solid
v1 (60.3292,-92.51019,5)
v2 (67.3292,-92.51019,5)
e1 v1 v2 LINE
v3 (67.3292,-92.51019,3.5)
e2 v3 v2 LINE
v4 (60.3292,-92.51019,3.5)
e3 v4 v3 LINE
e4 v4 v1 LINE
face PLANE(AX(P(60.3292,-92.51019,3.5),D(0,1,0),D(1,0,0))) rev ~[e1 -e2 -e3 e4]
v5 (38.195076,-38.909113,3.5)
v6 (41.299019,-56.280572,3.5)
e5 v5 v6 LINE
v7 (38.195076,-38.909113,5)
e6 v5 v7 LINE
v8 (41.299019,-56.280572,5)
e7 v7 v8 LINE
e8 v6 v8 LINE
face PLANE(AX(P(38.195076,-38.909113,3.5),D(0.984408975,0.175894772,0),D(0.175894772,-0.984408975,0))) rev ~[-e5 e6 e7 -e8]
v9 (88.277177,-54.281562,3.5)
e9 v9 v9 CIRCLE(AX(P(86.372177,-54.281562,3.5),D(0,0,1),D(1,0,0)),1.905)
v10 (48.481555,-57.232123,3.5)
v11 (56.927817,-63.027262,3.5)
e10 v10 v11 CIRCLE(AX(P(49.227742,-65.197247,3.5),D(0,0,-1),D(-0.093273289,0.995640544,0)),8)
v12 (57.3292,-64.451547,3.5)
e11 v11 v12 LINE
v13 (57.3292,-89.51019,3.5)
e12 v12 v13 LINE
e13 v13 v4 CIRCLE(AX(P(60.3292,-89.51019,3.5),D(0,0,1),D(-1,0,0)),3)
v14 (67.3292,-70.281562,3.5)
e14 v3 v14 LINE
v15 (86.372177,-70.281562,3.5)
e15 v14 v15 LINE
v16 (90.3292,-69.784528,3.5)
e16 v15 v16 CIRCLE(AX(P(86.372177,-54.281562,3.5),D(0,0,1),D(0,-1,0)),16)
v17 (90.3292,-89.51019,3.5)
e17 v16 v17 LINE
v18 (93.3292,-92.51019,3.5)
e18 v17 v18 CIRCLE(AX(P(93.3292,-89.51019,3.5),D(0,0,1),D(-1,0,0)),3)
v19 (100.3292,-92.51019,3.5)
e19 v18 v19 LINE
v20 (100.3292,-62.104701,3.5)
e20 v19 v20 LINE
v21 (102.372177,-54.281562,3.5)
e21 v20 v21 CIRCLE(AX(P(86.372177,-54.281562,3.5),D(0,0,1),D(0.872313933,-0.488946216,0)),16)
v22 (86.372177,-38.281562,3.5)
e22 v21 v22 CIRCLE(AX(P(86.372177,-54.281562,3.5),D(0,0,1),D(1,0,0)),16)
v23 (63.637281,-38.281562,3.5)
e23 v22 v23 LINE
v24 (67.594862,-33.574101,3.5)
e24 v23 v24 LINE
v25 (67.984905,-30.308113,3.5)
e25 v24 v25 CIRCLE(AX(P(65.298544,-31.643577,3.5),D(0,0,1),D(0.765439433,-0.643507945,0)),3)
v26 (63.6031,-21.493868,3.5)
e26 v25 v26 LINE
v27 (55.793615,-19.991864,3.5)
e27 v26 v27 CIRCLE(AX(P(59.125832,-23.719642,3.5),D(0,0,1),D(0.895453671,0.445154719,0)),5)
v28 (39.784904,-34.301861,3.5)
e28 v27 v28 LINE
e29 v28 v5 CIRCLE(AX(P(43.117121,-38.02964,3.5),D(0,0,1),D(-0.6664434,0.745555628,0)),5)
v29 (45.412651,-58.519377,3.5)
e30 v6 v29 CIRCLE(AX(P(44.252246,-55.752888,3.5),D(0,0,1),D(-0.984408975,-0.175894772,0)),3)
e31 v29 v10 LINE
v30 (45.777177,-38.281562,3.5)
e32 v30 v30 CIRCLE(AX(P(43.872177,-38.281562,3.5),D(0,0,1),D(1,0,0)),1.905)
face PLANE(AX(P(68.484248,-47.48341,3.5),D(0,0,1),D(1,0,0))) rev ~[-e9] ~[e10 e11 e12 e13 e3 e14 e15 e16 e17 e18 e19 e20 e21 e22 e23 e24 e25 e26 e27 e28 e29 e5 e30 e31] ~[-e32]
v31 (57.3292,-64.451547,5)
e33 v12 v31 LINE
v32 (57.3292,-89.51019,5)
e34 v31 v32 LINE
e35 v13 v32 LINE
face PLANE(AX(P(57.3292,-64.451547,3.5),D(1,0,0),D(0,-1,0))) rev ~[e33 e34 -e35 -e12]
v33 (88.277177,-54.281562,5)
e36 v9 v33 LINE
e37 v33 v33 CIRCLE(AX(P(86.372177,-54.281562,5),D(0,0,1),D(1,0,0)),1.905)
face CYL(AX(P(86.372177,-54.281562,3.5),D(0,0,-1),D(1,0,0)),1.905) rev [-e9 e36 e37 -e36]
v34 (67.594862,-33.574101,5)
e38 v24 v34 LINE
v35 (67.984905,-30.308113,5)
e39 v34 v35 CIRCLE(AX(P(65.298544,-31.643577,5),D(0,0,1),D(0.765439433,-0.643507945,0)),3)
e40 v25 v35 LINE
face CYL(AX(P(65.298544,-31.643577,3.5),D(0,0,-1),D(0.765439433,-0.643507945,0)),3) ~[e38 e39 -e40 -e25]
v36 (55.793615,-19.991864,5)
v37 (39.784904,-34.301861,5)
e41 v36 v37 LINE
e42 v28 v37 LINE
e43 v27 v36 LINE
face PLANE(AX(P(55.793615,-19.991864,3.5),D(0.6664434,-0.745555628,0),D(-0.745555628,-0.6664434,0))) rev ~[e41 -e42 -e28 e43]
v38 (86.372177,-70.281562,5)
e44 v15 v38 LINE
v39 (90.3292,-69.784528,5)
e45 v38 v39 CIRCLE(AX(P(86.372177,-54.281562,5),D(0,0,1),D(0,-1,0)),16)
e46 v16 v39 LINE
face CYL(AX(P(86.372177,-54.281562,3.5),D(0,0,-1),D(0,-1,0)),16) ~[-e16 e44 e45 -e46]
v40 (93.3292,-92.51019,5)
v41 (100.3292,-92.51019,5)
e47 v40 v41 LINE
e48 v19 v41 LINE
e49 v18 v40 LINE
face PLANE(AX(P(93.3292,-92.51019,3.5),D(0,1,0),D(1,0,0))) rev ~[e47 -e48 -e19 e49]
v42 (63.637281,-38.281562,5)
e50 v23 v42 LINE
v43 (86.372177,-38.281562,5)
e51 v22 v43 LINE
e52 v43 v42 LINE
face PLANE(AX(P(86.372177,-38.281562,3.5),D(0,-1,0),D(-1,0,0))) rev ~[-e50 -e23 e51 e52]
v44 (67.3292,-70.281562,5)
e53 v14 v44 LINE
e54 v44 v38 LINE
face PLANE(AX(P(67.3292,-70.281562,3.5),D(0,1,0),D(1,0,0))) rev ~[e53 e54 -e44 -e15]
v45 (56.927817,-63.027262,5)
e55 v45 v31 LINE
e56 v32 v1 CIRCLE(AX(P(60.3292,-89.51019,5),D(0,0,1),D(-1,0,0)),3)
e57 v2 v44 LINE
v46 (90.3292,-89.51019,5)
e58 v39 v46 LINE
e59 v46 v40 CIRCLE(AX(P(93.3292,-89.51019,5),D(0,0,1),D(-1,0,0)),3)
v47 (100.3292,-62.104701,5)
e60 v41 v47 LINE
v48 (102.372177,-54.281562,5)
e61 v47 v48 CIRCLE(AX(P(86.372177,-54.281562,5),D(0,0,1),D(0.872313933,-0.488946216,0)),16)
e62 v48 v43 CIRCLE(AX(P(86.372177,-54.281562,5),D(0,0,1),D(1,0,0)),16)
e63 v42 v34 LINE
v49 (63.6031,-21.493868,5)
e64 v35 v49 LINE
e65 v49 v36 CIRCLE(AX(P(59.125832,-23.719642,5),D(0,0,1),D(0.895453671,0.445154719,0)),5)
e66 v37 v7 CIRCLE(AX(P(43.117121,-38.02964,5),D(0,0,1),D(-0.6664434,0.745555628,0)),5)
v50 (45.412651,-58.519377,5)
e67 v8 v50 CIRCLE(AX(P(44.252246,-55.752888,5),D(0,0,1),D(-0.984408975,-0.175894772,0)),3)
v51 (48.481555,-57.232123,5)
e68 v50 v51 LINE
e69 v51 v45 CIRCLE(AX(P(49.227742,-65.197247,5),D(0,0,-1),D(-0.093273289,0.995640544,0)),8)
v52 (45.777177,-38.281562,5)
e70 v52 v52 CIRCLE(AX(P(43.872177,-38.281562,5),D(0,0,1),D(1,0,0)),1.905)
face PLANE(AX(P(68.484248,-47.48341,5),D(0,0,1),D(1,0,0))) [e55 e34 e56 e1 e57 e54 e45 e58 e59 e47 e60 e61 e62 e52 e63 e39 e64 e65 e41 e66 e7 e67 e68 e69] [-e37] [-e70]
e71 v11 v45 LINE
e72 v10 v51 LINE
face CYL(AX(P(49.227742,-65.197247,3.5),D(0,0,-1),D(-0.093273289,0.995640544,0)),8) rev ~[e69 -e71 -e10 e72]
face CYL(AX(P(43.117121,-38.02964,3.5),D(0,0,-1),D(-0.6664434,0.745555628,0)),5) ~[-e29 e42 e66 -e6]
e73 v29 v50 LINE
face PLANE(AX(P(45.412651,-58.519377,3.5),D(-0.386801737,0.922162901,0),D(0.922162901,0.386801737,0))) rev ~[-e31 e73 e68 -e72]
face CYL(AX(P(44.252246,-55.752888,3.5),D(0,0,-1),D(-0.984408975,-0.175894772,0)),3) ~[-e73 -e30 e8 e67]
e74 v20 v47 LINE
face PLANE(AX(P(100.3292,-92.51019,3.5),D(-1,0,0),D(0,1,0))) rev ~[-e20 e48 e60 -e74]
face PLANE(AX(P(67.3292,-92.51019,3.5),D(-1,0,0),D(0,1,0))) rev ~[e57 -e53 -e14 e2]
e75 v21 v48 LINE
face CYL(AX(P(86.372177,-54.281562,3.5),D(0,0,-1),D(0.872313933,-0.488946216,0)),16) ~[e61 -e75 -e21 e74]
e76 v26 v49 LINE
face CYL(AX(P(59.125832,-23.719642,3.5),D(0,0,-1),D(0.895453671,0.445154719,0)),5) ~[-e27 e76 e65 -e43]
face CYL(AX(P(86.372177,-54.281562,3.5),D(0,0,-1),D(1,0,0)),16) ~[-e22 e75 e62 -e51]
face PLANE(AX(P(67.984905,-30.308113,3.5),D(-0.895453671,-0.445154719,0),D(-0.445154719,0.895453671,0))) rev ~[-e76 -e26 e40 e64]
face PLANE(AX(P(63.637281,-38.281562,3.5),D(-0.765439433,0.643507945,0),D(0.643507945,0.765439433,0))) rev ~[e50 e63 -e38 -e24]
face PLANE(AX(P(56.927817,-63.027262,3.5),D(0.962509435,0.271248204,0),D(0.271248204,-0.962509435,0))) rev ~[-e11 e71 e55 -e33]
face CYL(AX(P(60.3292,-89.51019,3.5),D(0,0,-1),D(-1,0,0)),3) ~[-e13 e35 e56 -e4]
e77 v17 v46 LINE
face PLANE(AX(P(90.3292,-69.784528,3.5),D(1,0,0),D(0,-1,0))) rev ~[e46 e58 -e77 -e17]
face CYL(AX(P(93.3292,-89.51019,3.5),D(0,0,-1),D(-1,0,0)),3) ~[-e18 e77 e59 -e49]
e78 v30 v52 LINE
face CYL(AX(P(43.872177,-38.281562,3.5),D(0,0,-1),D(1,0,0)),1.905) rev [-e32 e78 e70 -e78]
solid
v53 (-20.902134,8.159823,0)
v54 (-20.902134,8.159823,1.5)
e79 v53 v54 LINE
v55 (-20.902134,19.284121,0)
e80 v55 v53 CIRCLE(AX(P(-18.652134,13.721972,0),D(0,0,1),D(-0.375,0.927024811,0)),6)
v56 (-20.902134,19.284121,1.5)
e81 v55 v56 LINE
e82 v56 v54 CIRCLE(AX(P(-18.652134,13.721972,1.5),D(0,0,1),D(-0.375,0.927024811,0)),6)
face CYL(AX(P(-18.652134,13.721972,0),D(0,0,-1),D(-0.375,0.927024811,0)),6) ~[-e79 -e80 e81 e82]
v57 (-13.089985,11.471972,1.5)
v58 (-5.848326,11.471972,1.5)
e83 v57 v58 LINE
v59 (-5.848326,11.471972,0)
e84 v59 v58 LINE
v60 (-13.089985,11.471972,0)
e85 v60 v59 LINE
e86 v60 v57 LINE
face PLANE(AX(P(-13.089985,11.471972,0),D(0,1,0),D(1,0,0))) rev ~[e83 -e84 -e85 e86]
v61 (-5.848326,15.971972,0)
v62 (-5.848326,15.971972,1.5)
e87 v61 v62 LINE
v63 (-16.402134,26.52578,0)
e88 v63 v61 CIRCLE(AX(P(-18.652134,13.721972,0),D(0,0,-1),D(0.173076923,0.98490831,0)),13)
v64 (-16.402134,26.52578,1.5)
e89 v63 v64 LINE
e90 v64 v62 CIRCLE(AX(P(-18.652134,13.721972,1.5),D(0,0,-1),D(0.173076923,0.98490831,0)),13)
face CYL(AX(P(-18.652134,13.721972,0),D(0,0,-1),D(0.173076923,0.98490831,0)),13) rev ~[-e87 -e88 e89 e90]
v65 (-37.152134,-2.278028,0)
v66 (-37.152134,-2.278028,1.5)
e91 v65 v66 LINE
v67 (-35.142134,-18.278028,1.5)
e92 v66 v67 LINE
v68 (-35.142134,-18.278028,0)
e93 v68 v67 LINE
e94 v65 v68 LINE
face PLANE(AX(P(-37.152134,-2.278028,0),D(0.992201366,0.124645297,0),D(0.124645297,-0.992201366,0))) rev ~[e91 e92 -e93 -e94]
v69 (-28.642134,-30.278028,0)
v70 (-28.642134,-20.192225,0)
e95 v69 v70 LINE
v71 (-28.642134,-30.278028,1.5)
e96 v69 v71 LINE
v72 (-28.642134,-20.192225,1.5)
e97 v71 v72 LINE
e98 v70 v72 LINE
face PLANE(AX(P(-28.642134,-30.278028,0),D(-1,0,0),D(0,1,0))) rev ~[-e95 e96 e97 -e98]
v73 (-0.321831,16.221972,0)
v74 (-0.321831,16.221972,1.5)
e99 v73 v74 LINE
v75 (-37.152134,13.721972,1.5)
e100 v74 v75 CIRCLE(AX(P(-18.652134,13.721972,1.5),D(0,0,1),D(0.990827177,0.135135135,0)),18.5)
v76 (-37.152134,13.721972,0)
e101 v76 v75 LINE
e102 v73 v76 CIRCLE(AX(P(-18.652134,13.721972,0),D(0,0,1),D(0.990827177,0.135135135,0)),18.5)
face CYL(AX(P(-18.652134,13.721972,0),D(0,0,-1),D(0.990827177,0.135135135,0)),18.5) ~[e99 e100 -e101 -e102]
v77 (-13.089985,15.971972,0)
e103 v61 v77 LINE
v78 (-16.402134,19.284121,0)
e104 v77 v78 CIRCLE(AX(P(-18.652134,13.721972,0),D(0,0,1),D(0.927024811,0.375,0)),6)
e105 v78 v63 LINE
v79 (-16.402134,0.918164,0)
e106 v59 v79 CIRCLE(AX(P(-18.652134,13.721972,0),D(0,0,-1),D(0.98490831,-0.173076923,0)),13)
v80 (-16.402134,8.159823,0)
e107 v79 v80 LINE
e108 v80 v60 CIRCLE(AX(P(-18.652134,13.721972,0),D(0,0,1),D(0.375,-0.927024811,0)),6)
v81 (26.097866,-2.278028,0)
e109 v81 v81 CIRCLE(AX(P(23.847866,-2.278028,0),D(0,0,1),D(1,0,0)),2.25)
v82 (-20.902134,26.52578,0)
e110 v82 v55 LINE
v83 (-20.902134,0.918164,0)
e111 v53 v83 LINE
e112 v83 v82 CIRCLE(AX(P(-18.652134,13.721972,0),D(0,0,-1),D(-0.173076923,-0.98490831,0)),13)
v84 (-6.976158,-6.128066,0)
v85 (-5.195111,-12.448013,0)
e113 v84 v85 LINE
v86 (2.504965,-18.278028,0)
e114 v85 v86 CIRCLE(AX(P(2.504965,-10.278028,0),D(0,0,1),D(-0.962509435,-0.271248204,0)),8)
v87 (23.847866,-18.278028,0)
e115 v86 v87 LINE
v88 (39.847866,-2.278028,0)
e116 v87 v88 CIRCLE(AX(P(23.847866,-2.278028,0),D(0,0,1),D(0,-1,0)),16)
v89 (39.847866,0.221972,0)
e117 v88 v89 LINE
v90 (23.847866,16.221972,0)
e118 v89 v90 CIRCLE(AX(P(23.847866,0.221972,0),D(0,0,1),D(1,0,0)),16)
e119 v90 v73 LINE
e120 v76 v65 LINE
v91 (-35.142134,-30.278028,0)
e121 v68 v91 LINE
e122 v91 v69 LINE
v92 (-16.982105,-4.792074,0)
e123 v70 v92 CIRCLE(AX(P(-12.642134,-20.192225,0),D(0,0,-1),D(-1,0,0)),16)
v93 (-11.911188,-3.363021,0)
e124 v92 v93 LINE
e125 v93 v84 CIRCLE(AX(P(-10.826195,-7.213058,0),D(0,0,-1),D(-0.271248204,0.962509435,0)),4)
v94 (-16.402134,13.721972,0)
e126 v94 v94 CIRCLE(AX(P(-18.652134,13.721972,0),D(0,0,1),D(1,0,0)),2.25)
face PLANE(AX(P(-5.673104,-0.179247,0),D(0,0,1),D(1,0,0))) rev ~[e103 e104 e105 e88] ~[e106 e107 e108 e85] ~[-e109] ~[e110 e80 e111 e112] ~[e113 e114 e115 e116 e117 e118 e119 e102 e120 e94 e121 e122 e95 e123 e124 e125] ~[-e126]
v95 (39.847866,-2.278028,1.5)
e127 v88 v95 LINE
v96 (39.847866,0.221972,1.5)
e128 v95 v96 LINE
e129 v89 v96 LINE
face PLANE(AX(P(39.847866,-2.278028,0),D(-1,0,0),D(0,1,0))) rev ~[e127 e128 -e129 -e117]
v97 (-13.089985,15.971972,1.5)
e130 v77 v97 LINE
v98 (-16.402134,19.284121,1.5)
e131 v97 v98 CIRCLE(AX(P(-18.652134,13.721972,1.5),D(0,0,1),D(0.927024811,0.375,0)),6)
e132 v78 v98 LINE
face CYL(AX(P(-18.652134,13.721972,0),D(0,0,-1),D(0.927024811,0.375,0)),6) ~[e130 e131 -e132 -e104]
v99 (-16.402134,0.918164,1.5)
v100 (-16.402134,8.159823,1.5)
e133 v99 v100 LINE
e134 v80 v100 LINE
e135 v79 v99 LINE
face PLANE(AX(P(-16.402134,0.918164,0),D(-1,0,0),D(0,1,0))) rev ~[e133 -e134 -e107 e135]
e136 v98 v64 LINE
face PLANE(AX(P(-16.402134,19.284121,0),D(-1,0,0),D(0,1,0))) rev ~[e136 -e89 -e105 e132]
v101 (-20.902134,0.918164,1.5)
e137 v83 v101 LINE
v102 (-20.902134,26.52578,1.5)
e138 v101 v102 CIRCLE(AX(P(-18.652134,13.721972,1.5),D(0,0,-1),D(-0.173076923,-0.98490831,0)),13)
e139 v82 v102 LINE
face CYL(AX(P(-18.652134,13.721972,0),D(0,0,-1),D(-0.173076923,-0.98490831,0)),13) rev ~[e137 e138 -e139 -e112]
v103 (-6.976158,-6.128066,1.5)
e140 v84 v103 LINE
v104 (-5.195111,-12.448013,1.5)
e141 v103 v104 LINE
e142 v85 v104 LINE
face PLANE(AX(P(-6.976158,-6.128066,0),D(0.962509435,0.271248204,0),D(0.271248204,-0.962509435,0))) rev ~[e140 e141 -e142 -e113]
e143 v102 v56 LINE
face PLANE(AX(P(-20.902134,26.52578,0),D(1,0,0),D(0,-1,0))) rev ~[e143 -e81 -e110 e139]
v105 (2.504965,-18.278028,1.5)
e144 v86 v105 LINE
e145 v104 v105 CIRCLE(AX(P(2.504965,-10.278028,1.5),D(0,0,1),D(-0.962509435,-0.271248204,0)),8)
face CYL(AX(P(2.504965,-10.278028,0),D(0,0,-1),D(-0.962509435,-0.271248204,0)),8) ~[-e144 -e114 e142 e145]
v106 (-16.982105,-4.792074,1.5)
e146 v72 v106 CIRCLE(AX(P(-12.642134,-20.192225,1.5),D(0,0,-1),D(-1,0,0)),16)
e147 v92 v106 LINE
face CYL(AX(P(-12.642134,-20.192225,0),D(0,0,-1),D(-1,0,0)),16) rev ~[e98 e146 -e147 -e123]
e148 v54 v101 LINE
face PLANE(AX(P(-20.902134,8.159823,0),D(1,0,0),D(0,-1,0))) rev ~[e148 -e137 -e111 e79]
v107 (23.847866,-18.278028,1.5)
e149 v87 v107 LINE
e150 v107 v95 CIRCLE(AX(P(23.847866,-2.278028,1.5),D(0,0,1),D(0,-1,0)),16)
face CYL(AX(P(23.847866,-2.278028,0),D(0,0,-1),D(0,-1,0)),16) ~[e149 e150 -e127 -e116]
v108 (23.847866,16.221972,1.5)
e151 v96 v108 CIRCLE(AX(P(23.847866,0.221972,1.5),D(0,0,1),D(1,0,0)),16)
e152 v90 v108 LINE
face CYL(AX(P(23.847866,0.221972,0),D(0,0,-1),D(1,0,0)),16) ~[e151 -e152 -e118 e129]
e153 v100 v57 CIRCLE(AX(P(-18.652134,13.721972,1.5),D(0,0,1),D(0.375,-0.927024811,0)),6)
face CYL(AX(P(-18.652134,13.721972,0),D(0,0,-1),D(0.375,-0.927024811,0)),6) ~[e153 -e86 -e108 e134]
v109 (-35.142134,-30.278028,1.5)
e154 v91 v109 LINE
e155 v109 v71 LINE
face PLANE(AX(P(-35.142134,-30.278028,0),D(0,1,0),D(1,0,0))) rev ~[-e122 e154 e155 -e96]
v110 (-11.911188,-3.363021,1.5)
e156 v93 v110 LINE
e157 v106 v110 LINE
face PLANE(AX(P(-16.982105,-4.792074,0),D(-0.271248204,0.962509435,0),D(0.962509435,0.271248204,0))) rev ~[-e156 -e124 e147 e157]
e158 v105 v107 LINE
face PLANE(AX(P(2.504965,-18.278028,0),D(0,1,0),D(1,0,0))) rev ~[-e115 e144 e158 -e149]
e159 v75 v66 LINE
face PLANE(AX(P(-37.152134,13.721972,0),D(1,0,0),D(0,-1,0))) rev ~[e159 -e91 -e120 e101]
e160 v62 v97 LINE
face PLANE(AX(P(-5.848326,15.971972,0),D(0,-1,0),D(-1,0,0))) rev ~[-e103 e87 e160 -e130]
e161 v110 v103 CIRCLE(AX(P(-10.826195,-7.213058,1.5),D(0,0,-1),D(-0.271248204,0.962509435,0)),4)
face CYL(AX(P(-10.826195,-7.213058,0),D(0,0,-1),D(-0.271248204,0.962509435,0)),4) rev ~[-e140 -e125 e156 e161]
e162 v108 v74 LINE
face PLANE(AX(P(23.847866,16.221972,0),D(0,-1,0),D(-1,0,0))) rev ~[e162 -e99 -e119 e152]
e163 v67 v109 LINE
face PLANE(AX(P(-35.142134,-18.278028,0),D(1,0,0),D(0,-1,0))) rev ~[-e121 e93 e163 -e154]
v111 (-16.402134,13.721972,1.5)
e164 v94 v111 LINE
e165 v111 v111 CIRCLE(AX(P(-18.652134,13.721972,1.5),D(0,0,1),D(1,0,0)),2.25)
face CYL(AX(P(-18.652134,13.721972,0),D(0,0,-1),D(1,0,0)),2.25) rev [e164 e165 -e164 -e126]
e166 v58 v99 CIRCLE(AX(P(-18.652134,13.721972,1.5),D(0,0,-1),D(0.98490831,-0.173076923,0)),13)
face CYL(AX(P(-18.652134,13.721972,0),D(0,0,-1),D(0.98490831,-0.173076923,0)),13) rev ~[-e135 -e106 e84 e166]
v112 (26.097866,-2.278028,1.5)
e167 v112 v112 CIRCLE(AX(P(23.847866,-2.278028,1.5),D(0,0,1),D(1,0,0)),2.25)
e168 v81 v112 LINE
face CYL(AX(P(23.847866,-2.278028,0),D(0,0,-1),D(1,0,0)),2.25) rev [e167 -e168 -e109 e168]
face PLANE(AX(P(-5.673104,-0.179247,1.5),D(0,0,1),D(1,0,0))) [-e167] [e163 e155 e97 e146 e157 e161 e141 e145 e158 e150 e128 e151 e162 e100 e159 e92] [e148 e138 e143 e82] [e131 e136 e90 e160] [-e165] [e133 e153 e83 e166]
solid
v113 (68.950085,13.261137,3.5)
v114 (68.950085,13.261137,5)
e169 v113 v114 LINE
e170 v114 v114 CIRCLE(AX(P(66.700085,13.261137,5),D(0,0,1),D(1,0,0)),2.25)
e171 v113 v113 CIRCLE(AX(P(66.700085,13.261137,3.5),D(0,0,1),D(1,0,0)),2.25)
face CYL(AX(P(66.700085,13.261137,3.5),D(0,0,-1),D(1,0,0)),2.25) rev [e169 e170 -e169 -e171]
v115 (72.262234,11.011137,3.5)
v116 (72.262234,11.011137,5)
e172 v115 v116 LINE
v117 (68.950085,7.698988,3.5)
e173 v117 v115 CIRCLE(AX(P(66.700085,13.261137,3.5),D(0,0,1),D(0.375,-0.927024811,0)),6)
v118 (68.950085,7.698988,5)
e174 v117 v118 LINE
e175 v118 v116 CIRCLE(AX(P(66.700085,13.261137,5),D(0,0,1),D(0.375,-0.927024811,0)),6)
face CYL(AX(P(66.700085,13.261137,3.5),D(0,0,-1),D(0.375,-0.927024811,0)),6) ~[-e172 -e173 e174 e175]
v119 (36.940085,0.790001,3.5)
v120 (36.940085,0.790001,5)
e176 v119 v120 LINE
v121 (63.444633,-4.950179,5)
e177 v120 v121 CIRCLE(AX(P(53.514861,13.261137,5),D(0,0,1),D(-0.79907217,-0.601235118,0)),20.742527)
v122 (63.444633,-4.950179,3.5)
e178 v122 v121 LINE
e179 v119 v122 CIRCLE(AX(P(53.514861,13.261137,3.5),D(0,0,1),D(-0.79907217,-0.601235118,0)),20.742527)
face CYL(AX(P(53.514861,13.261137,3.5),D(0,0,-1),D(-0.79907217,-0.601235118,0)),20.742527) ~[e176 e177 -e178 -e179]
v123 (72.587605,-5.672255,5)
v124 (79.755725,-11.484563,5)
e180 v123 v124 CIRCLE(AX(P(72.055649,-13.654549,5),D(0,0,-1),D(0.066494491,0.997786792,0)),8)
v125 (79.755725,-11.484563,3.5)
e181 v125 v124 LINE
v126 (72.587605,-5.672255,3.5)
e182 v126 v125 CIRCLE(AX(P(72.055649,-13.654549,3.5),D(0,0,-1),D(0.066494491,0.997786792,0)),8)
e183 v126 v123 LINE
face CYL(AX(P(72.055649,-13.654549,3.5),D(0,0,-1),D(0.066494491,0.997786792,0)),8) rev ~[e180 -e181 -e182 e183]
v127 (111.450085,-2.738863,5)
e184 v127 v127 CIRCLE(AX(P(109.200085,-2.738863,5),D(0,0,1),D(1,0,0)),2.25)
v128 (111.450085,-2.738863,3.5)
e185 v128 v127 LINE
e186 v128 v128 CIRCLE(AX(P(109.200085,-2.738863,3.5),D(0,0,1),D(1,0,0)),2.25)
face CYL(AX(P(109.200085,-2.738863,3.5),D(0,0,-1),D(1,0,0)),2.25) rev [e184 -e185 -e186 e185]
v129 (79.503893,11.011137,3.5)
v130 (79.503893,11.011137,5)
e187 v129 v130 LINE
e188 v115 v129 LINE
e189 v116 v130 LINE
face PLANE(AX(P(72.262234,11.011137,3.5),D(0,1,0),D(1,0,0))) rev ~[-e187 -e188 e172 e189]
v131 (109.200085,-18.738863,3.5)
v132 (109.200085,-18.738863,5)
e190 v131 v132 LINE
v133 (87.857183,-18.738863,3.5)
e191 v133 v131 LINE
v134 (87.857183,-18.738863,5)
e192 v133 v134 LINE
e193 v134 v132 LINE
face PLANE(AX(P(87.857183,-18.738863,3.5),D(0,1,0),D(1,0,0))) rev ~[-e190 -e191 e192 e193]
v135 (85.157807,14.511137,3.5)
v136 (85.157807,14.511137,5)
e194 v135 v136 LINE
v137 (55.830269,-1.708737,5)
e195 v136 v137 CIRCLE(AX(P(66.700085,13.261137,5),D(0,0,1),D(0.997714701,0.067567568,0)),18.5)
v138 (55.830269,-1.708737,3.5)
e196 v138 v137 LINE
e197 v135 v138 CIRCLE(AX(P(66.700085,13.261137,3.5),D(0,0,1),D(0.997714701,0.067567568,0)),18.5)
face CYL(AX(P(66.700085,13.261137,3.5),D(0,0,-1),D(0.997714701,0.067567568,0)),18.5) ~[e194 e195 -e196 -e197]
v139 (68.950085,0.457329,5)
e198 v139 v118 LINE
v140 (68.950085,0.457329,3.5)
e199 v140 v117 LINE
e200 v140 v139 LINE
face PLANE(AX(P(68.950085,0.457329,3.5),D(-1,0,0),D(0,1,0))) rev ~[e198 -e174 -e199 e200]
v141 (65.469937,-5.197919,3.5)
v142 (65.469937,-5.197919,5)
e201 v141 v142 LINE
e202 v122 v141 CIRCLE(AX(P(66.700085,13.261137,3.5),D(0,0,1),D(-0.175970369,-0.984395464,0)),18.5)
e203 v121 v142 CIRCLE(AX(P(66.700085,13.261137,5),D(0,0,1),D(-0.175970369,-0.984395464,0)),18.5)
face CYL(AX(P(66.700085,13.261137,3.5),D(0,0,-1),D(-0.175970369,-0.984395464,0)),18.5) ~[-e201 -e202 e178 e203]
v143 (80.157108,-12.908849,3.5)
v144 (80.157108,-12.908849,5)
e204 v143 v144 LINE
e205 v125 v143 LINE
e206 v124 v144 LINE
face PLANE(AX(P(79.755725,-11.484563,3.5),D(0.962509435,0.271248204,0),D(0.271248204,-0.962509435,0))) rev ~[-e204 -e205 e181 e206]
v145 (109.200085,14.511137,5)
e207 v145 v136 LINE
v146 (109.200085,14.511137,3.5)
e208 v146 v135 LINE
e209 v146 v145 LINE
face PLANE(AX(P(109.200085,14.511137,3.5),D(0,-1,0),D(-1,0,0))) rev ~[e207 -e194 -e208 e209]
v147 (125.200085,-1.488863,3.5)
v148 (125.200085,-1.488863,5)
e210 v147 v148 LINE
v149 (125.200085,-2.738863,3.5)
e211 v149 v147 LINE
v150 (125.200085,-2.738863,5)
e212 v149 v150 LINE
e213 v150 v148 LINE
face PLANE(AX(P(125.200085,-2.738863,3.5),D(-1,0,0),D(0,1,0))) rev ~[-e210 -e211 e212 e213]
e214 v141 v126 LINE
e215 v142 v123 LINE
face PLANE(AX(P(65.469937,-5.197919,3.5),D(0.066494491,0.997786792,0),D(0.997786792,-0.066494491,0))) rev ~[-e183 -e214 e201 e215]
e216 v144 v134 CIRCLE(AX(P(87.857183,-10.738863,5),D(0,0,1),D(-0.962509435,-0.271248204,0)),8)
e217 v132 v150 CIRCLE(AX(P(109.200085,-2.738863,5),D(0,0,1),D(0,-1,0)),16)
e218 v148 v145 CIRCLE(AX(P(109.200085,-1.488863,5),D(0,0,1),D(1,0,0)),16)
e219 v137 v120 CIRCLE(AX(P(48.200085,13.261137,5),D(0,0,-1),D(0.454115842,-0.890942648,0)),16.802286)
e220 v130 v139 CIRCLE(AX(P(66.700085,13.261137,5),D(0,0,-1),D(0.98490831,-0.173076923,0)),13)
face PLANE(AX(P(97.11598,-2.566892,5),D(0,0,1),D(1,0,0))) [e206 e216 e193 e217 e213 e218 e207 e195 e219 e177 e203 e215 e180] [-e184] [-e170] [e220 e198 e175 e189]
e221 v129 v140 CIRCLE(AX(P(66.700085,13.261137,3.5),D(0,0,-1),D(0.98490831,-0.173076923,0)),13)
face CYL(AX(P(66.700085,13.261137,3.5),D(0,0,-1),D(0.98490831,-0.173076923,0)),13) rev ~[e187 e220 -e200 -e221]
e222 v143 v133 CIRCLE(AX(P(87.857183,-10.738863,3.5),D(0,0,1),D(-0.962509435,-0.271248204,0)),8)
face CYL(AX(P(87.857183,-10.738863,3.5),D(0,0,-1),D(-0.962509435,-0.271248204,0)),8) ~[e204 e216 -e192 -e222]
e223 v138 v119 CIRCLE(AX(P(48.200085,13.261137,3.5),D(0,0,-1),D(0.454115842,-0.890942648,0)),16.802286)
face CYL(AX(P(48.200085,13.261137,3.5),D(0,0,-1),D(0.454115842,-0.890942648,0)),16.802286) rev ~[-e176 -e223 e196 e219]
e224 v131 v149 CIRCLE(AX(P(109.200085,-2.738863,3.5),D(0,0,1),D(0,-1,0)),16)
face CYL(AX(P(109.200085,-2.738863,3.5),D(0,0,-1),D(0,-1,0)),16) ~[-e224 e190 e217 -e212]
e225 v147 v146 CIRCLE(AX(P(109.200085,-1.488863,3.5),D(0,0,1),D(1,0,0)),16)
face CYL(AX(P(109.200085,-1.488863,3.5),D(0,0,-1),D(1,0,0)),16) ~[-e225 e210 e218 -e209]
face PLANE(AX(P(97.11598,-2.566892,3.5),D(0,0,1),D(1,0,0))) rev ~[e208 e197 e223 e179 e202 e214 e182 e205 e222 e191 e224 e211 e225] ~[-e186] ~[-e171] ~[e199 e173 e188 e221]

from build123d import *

# Parameters (mm, degrees)
F1_R     = 2.25
F2_DEPTH = 1.5
F3_R     = 2.25
F4_DEPTH = 1.5
F5_R     = 1.905
F6_DEPTH = 1.5


# Not quite as in the source:
# - a feature names something its author has since deleted; it is built from what else it names


with BuildPart() as f2:
    # F1 (on Top) → F2 (new body)
    with BuildSketch(Plane.XY):
        with BuildLine():
            Line((23.8478663564, 16.2219721824), (-0.3218308638, 16.2219721824))
            ThreePointArc((-0.3218308638, 16.2219721824), (-19.9050100488, 32.1794991216), (-37.1521336436, 13.7219721824))
            Line((-37.1521336436, 13.7219721824), (-37.1521336436, -2.2780278176))
            Line((-37.1521336436, -2.2780278176), (-35.1421336436, -18.2780278176))
            Line((-35.1421336436, -18.2780278176), (-35.1421336436, -30.2780278176))
            Line((-35.1421336436, -30.2780278176), (-28.6421336436, -30.2780278176))
            Line((-28.6421336436, -30.2780278176), (-28.6421336436, -20.1922246362))
            ThreePointArc((-28.6421336436, -20.1922246362), (-25.3982996099, -10.5340555633), (-16.9821049136, -4.7920736832))
            Line((-16.9821049136, -4.7920736832), (-11.9111882435, -3.3630206351))
            ThreePointArc((-11.9111882435, -3.3630206351), (-8.8710134123, -3.723464802), (-6.9761576878, -6.1280655559))
            Line((-6.9761576878, -6.1280655559), (-5.1951107108, -12.4480134526))
            ThreePointArc((-5.1951107108, -12.4480134526), (-2.3241197708, -16.6561108008), (2.5049647657, -18.2780278176))
            Line((2.5049647657, -18.2780278176), (23.8478663564, -18.2780278176))
            ThreePointArc((23.8478663564, -18.2780278176), (35.1615748554, -13.5917363166), (39.8478663564, -2.2780278176))
            Line((39.8478663564, -2.2780278176), (39.8478663564, 0.2219721824))
            ThreePointArc((39.8478663564, 0.2219721824), (35.1615748554, 11.5356806814), (23.8478663564, 16.2219721824))
        make_face()
        with Locations((23.8478663564, -2.2780278176)):
            Circle(F1_R, mode=Mode.SUBTRACT)
        with BuildLine():
            Line((-20.9021336436, 26.5257802097), (-20.9021336436, 19.2841210477))
            ThreePointArc((-20.9021336436, 19.2841210477), (-24.6521336436, 13.7219721824), (-20.9021336436, 8.1598233171))
            Line((-20.9021336436, 8.1598233171), (-20.9021336436, 0.9181641551))
            ThreePointArc((-20.9021336436, 0.9181641551), (-31.6521336436, 13.7219721824), (-20.9021336436, 26.5257802097))
        make_face(mode=Mode.SUBTRACT)
        with Locations((-18.6521336436, 13.7219721824)):
            Circle(F1_R, mode=Mode.SUBTRACT)
        with BuildLine():
            ThreePointArc((-16.4021336436, 8.1598233171), (-14.4094929565, 9.4793314953), (-13.0899847783, 11.4719721824))
            Line((-13.0899847783, 11.4719721824), (-5.8483256163, 11.4719721824))
            ThreePointArc((-5.8483256163, 11.4719721824), (-9.4597454882, 4.529584027), (-16.4021336436, 0.9181641551))
            Line((-16.4021336436, 0.9181641551), (-16.4021336436, 8.1598233171))
        make_face(mode=Mode.SUBTRACT)
        with BuildLine():
            ThreePointArc((-13.0899847783, 15.9719721824), (-14.4094929565, 17.9646128695), (-16.4021336436, 19.2841210477))
            Line((-16.4021336436, 19.2841210477), (-16.4021336436, 26.5257802097))
            ThreePointArc((-16.4021336436, 26.5257802097), (-9.4597454882, 22.9143603378), (-5.8483256163, 15.9719721824))
            Line((-5.8483256163, 15.9719721824), (-13.0899847783, 15.9719721824))
        make_face(mode=Mode.SUBTRACT)
    extrude(amount=F2_DEPTH)


with BuildPart() as f4:
    # F3 (on offset) → F4 (new body)
    with BuildSketch(Plane.XY.offset(3.5)):
        with BuildLine():
            Line((109.2000847661, 14.5111365989), (85.1578067274, 14.5111365989))
            ThreePointArc((85.1578067274, 14.5111365989), (85.1895122354, 13.8864939832), (85.2000847661, 13.2611365989))
            ThreePointArc((85.2000847661, 13.2611365989), (79.3391563377, -0.2482627146), (65.4699366786, -5.1979190563))
            Line((65.4699366786, -5.1979190563), (72.5876051284, -5.6722546017))
            ThreePointArc((72.5876051284, -5.6722546017), (77.0942321722, -7.4406386068), (79.7557246751, -11.4845633041))
            Line((79.7557246751, -11.4845633041), (80.1571076989, -12.9088490361))
            ThreePointArc((80.1571076989, -12.9088490361), (83.028098639, -17.1169463843), (87.8571831754, -18.7388634011))
            Line((87.8571831754, -18.7388634011), (109.2000847661, -18.7388634011))
            ThreePointArc((109.2000847661, -18.7388634011), (120.5137932651, -14.0525719001), (125.2000847661, -2.7388634011))
            Line((125.2000847661, -2.7388634011), (125.2000847661, -1.4888634011))
            ThreePointArc((125.2000847661, -1.4888634011), (120.5137932651, 9.8248450979), (109.2000847661, 14.5111365989))
        make_face()
        with Locations((109.2000847661, -2.7388634011)):
            Circle(F3_R, mode=Mode.SUBTRACT)
        with BuildLine():
            ThreePointArc((85.2000847661, 13.2611365989), (85.1895122354, 13.8864939832), (85.1578067274, 14.5111365989))
            ThreePointArc((85.1578067274, 14.5111365989), (57.7465852827, 29.4501713755), (55.8302690835, -1.7087367147))
            ThreePointArc((55.8302690835, -1.7087367147), (59.4538765607, -3.7606866479), (63.4446329394, -4.9501794822))
            ThreePointArc((63.4446329394, -4.9501794822), (64.4538667509, -5.1019923455), (65.4699366786, -5.1979190563))
            ThreePointArc((65.4699366786, -5.1979190563), (79.3391563377, -0.2482627146), (85.2000847661, 13.2611365989))
        make_face()
        with BuildLine():
            Line((68.9500847661, 0.4573285716), (68.9500847661, 7.6989877336))
            ThreePointArc((68.9500847661, 7.6989877336), (70.9427254533, 9.0184959118), (72.2622336315, 11.0111365989))
            Line((72.2622336315, 11.0111365989), (79.5038927935, 11.0111365989))
            ThreePointArc((79.5038927935, 11.0111365989), (75.8924729216, 4.0687484435), (68.9500847661, 0.4573285716))
        make_face(mode=Mode.SUBTRACT)
        with Locations((66.7000847661, 13.2611365989)):
            Circle(F3_R, mode=Mode.SUBTRACT)
        with BuildLine():
            ThreePointArc((63.4446329394, -4.9501794822), (59.4538765607, -3.7606866479), (55.8302690835, -1.7087367147))
            ThreePointArc((55.8302690835, -1.7087367147), (45.9967207055, -3.3960542374), (36.9400847661, 0.7900011357))
            ThreePointArc((36.9400847661, 0.7900011357), (49.1243667434, -7.0114058331), (63.4446329394, -4.9501794822))
        make_face()
    extrude(amount=F4_DEPTH)


with BuildPart() as f6:
    # F5 (on offset) → F6 (new body)
    with BuildSketch(Plane.XY.offset(3.5)):
        with BuildLine():
            Line((86.3721772379, -38.2815617886), (63.6372811817, -38.2815617886))
            Line((63.6372811817, -38.2815617886), (67.5948618811, -33.5741011418))
            ThreePointArc((67.5948618811, -33.5741011418), (68.2773760162, -31.9993262849), (67.9849045951, -30.3081131515))
            Line((67.9849045951, -30.3081131515), (63.6031002529, -21.4938680874))
            ThreePointArc((63.6031002529, -21.4938680874), (60.07017827, -18.8096304864), (55.7936149014, -19.9918635388))
            Line((55.7936149014, -19.9918635388), (39.7849043568, -34.3018614395))
            ThreePointArc((39.7849043568, -34.3018614395), (38.3906107486, -36.3986590518), (38.195076482, -38.9091134417))
            Line((38.195076482, -38.9091134417), (41.2990189026, -56.2805721912))
            ThreePointArc((41.2990189026, -56.2805721912), (42.8181559772, -58.3879184832), (45.412651037, -58.5193765789))
            Line((45.412651037, -58.5193765789), (48.4815553554, -57.232122972))
            ThreePointArc((48.4815553554, -57.232122972), (53.7537831872, -58.6006612256), (56.9278171468, -63.0272616916))
            Line((56.9278171468, -63.0272616916), (57.3292001707, -64.4515474235))
            ThreePointArc((57.3292001707, -64.4515474235), (60.2001911107, -68.6596447717), (65.0292756472, -70.2815617886))
            Line((65.0292756472, -70.2815617886), (67.3292001707, -70.2815617886))
            Line((67.3292001707, -70.2815617886), (86.3721772379, -70.2815617886))
            ThreePointArc((86.3721772379, -70.2815617886), (88.3662354627, -70.1568171187), (90.3292001707, -69.7845282631))
            ThreePointArc((90.3292001707, -69.7845282631), (96.117596449, -66.9711955264), (100.3292001707, -62.1047012385))
            ThreePointArc((100.3292001707, -62.1047012385), (101.8530100147, -58.324310425), (102.3721772379, -54.2815617886))
            ThreePointArc((102.3721772379, -54.2815617886), (97.6858857369, -42.9678532896), (86.3721772379, -38.2815617886))
        make_face()
        with Locations((43.8721772379, -38.2815617886)):
            Circle(F5_R, mode=Mode.SUBTRACT)
        with Locations((86.3721772379, -54.2815617886)):
            Circle(F5_R, mode=Mode.SUBTRACT)
        with BuildLine():
            Line((100.3292001707, -92.5101898611), (100.3292001707, -62.1047012385))
            ThreePointArc((100.3292001707, -62.1047012385), (96.117596449, -66.9711955264), (90.3292001707, -69.7845282631))
            Line((90.3292001707, -69.7845282631), (90.3292001707, -89.5101898611))
            ThreePointArc((90.3292001707, -89.5101898611), (91.2078798271, -91.6315102046), (93.3292001707, -92.5101898611))
            Line((93.3292001707, -92.5101898611), (100.3292001707, -92.5101898611))
        make_face()
        with BuildLine():
            Line((67.3292001707, -92.5101898611), (67.3292001707, -70.2815617886))
            Line((67.3292001707, -70.2815617886), (65.0292756472, -70.2815617886))
            ThreePointArc((65.0292756472, -70.2815617886), (60.2001911107, -68.6596447717), (57.3292001707, -64.4515474235))
            Line((57.3292001707, -64.4515474235), (57.3292001707, -89.5101898611))
            ThreePointArc((57.3292001707, -89.5101898611), (58.2078798271, -91.6315102046), (60.3292001707, -92.5101898611))
            Line((60.3292001707, -92.5101898611), (67.3292001707, -92.5101898611))
        make_face()
    extrude(amount=F6_DEPTH)


solid = Compound([f2.part, f4.part, f6.part])
